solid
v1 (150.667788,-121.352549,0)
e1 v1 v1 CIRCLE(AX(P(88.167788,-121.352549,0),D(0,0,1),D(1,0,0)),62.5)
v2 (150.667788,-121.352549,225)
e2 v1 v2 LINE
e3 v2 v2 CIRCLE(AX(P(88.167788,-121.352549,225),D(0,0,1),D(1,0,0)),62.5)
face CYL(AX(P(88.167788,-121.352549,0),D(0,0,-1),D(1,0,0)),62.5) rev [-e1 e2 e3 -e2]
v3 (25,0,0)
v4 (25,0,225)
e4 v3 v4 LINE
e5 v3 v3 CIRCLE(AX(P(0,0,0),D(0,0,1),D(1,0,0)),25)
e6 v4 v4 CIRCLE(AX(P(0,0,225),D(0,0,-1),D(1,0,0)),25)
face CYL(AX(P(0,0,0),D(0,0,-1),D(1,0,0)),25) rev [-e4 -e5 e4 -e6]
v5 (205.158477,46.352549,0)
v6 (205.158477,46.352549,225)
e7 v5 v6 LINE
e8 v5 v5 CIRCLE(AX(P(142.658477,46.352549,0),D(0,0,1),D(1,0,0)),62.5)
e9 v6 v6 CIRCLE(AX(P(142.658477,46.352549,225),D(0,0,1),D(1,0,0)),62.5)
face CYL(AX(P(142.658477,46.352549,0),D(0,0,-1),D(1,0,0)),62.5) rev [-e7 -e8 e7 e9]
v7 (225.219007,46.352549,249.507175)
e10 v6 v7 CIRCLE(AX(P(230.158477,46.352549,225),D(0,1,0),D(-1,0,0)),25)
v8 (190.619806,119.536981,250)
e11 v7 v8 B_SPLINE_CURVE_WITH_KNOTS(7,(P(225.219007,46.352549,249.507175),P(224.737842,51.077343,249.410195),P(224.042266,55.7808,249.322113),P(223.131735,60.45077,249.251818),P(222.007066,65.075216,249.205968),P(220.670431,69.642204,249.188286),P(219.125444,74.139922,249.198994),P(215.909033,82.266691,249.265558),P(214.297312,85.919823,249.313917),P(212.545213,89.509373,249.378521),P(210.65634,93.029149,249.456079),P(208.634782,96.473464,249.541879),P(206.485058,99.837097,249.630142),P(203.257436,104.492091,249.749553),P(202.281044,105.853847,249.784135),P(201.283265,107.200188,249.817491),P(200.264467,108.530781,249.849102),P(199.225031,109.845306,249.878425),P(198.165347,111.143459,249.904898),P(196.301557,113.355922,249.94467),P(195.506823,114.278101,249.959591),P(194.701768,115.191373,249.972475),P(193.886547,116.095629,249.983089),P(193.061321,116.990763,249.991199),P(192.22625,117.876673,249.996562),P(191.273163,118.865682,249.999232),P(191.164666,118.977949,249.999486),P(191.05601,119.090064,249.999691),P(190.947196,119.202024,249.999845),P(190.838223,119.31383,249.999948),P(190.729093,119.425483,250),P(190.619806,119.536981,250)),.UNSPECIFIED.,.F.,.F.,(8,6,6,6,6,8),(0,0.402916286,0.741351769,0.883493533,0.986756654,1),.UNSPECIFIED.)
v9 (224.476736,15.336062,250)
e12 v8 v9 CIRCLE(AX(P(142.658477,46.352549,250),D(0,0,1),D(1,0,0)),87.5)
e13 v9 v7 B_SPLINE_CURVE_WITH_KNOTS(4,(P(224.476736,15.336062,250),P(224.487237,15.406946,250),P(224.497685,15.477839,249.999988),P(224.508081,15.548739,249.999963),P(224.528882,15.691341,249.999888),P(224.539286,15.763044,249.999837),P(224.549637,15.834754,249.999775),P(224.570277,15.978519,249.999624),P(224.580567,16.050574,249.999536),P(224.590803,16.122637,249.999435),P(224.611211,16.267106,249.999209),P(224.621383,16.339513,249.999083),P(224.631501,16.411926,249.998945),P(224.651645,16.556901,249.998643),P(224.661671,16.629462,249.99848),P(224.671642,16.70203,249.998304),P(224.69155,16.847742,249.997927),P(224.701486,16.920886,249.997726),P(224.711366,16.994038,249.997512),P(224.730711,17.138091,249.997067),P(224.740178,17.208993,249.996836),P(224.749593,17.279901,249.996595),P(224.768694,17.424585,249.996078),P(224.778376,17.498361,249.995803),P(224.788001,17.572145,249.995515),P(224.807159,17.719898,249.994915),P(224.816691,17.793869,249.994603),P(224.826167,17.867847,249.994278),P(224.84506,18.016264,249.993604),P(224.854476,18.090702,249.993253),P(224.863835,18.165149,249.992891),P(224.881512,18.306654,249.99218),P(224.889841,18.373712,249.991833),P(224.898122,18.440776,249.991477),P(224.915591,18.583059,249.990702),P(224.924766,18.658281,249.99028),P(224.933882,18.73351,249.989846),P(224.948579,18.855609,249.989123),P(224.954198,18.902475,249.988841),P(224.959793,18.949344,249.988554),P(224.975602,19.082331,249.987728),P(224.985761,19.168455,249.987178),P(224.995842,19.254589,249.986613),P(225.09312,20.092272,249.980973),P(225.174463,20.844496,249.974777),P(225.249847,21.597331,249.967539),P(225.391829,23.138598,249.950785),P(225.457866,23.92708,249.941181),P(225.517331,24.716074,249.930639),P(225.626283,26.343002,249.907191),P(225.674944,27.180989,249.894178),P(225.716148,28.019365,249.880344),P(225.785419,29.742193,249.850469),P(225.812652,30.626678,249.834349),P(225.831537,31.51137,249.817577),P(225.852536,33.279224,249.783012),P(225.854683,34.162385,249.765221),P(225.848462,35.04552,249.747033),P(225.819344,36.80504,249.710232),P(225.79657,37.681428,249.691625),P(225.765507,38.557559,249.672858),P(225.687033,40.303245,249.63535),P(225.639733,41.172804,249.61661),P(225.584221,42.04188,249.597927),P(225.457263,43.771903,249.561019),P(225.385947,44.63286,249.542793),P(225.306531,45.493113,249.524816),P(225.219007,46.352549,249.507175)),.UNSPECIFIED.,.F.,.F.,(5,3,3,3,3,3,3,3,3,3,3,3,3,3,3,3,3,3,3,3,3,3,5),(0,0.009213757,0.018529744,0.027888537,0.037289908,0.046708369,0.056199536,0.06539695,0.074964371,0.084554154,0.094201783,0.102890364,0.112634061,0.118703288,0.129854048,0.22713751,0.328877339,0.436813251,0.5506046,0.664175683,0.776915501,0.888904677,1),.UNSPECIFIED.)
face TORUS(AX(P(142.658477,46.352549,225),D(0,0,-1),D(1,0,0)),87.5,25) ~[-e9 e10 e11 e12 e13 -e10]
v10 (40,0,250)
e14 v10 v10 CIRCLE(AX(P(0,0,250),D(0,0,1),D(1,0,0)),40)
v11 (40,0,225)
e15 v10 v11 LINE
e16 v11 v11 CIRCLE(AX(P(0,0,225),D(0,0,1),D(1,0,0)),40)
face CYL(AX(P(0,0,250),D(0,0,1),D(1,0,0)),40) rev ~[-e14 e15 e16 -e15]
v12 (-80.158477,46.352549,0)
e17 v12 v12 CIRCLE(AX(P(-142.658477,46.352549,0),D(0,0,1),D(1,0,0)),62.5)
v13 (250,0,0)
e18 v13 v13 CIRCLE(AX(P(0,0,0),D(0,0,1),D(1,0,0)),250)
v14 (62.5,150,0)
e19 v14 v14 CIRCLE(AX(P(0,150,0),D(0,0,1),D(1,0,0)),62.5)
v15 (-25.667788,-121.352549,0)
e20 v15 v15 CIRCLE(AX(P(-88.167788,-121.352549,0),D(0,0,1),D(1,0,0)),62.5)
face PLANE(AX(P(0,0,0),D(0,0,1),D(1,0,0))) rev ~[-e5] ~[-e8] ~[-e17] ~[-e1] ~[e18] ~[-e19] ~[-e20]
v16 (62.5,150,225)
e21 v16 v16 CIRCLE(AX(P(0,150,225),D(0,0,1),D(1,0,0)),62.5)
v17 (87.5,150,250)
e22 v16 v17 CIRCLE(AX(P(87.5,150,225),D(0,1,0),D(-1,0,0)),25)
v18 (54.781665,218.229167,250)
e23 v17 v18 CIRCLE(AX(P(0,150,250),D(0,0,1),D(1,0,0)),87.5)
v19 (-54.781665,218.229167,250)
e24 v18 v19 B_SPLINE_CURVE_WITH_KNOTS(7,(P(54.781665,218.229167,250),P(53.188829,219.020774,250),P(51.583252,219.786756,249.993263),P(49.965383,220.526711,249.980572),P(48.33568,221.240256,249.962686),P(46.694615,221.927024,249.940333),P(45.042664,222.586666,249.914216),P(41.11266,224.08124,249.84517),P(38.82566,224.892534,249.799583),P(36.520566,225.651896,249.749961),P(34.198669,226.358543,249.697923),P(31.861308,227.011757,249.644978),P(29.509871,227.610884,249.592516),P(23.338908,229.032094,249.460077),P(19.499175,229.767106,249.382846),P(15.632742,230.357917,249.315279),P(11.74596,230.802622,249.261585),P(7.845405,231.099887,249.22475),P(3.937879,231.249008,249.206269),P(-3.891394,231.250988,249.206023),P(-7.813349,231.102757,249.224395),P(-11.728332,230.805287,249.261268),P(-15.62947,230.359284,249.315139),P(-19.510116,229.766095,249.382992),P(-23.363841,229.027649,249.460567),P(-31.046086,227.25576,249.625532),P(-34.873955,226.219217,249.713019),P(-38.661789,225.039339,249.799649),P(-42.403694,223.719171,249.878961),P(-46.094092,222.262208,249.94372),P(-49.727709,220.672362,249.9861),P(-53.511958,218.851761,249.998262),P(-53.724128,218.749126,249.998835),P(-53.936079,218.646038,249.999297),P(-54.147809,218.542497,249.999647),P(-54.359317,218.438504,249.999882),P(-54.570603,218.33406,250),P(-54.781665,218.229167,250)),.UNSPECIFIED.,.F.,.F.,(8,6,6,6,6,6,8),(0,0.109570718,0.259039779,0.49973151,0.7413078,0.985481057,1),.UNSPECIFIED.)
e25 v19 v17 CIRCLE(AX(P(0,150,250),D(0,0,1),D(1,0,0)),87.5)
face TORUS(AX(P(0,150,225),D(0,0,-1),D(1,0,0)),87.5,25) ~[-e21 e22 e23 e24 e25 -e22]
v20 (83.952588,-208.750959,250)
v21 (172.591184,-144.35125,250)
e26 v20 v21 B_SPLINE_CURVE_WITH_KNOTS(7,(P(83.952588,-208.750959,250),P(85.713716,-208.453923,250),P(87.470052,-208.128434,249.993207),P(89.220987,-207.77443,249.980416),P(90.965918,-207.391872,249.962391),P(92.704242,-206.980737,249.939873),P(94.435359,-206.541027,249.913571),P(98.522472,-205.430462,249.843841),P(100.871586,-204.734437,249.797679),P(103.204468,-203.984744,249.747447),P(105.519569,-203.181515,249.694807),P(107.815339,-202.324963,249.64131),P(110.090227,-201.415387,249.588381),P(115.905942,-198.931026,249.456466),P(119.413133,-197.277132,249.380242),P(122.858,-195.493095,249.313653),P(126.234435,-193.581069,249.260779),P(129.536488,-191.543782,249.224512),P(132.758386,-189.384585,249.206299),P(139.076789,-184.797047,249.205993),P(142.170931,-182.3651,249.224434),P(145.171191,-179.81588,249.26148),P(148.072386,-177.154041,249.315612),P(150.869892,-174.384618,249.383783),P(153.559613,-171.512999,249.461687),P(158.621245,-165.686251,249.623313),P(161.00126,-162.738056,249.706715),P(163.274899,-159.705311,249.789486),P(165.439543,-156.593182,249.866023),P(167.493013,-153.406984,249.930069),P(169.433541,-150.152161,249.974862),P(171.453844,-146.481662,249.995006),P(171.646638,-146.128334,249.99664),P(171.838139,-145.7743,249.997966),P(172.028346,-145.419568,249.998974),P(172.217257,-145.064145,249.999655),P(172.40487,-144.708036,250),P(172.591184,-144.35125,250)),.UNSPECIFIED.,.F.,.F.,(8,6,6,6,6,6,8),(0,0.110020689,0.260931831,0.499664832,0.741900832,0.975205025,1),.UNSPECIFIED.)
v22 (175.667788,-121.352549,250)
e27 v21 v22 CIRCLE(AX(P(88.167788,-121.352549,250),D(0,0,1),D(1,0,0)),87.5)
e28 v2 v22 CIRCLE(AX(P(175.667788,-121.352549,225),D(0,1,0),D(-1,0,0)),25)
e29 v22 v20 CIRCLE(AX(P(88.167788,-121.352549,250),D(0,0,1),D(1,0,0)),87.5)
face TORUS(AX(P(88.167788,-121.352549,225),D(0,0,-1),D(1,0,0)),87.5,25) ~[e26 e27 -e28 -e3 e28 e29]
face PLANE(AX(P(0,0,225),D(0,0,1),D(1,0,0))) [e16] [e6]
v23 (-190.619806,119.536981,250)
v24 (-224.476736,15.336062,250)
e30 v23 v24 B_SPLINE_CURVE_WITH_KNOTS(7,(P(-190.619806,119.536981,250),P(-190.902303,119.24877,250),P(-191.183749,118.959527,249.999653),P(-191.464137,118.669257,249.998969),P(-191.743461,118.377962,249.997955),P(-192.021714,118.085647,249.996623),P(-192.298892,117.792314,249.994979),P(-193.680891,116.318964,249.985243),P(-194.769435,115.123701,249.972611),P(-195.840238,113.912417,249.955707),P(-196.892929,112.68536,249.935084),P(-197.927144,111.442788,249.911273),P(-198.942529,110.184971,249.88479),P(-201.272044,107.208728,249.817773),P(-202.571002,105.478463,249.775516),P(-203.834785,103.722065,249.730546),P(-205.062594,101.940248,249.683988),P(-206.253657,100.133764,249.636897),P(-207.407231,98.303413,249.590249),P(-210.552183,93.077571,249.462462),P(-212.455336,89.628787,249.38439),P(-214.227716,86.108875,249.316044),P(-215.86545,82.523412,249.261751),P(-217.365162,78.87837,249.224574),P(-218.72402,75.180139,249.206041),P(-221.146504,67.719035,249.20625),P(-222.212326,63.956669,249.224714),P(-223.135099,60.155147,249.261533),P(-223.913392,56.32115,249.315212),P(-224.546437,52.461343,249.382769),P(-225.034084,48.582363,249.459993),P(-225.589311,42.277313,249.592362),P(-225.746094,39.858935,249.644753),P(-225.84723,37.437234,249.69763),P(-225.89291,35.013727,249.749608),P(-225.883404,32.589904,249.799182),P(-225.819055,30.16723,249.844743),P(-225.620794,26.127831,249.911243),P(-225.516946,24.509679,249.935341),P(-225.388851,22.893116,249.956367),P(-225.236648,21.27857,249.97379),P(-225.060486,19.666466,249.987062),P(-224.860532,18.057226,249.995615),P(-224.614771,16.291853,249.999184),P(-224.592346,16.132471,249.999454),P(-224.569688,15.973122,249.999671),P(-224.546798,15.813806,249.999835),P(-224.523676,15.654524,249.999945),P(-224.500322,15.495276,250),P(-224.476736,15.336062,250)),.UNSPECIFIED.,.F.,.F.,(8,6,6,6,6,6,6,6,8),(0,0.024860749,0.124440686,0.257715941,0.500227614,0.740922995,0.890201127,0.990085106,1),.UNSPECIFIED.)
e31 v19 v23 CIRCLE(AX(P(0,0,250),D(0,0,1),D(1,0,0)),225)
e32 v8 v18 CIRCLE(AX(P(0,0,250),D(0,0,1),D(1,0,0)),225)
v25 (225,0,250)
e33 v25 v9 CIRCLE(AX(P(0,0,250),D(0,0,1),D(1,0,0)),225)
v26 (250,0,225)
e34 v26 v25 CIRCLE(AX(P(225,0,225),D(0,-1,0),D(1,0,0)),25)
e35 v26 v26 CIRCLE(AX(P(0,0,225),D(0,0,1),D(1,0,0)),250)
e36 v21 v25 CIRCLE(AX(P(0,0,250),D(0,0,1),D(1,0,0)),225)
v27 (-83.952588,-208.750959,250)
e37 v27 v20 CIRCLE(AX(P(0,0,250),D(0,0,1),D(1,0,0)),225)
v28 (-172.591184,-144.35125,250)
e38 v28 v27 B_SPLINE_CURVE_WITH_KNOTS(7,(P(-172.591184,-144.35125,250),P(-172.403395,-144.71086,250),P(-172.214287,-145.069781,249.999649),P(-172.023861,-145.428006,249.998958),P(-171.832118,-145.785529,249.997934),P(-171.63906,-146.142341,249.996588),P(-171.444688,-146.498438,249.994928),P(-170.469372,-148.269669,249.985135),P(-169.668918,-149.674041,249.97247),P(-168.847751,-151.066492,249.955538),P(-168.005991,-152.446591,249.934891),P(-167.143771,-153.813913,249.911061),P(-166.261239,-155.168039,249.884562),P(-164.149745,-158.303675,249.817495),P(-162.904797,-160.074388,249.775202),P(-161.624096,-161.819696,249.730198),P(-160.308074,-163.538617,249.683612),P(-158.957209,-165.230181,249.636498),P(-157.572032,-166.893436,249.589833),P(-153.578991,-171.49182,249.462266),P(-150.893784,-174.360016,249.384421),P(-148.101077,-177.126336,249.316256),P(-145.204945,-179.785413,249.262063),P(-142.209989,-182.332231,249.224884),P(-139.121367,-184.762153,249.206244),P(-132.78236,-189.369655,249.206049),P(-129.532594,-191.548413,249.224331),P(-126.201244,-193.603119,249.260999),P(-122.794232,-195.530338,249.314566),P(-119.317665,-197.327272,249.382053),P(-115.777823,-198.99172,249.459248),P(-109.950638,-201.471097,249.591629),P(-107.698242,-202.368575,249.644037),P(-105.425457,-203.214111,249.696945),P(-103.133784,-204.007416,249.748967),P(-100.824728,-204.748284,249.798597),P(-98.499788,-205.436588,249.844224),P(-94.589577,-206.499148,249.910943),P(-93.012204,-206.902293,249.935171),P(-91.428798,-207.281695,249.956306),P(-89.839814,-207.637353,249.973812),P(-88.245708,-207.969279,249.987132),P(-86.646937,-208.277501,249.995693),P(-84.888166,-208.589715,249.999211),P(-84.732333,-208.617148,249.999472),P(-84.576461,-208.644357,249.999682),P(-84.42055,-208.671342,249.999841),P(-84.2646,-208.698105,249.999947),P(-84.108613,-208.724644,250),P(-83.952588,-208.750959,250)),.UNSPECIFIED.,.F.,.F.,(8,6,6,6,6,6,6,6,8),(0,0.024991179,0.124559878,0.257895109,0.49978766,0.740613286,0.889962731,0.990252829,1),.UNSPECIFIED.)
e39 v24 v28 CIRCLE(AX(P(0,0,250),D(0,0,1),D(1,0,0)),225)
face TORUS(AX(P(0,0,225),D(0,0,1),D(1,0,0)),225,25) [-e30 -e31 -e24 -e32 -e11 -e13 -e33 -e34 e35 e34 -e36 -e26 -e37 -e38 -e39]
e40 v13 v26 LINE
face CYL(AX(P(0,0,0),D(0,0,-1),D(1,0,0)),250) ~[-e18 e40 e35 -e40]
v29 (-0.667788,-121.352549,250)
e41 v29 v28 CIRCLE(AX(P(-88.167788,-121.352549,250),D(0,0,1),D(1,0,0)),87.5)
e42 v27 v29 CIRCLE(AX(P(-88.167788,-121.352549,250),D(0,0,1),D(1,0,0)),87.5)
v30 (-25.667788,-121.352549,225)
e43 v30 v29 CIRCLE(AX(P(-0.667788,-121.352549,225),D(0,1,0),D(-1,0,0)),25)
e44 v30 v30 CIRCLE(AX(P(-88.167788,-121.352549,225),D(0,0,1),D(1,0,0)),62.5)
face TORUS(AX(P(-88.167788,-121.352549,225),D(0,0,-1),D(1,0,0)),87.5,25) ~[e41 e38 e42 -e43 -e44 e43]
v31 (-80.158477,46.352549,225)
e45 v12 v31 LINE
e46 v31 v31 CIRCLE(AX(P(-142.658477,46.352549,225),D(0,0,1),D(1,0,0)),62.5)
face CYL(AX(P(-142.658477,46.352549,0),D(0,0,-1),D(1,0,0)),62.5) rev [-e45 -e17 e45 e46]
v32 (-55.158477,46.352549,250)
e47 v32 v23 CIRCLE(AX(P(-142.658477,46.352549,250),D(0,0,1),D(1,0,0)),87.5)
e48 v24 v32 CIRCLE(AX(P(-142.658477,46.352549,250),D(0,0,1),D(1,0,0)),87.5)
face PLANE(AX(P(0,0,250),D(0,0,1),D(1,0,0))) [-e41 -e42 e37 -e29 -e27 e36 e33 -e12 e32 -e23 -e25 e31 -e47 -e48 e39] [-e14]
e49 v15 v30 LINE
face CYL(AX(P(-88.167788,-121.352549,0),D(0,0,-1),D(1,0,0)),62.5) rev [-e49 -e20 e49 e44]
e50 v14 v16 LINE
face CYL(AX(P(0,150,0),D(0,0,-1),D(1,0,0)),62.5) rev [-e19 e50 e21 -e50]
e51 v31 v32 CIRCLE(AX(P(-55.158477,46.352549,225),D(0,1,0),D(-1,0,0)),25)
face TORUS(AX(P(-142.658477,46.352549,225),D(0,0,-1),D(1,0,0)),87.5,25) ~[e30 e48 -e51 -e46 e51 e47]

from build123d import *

# Parameters (mm, degrees)
F0_R     = 250
F0_R_2   = 62.5
F0_R_3   = 25
F1_DEPTH = 250
F3_R     = 40
F4_DEPTH = 25


# Not quite as in the source:
# - a fillet or chamfer that OpenCascade refuses, or shapes differently, is made with other operations: its cross-section is extruded or revolved along the edge and cut away or added


with BuildPart() as f1:
    # F0 (on Top) → F1 (new body)
    with BuildSketch(Plane.XY):
        Circle(F0_R)
        with Locations((-88.1677878439, -121.3525491562)):
            Circle(F0_R_2, mode=Mode.SUBTRACT)
        with Locations((88.1677878439, -121.3525491562)):
            Circle(F0_R_2, mode=Mode.SUBTRACT)
        with Locations((-142.6584774443, 46.3525491562)):
            Circle(F0_R_2, mode=Mode.SUBTRACT)
        Circle(F0_R_3, mode=Mode.SUBTRACT)
        with Locations((142.6584774443, 46.3525491562)):
            Circle(F0_R_2, mode=Mode.SUBTRACT)
        with Locations((0, 150)):
            Circle(F0_R_2, mode=Mode.SUBTRACT)
    extrude(amount=F1_DEPTH)

    # F2: fillet of radius 25 on 6 edges, made by hand

    # F2_s1 → F2_t2 (revolve, cut)
    with BuildSketch(Plane.XZ.offset(121.3525491562)):
        with BuildLine():
            ThreePointArc((-25.6677878439, 225), (-18.3454573735, 242.6776695297), (-0.6677878439, 250))
            Line((-0.6677878439, 250), (-25.6677878439, 250))
            Line((-25.6677878439, 250), (-25.6677878439, 225))
        make_face()
    revolve(axis=Axis((-88.1677878439, -121.3525491562, 250), (0, 0, 1)), mode=Mode.SUBTRACT)

    # F2_s3 → F2_t4 (revolve, cut)
    with BuildSketch(Plane.XZ.offset(-46.3525491562)):
        with BuildLine():
            ThreePointArc((-80.1584774443, 225), (-72.8361469739, 242.6776695297), (-55.1584774443, 250))
            Line((-55.1584774443, 250), (-80.1584774443, 250))
            Line((-80.1584774443, 250), (-80.1584774443, 225))
        make_face()
    revolve(axis=Axis((-142.6584774443, 46.3525491562, 250), (0, 0, 1)), mode=Mode.SUBTRACT)

    # F2_s5 → F2_t6 (revolve, cut)
    with BuildSketch(Plane.XZ.offset(-150)):
        with BuildLine():
            ThreePointArc((62.5, 225), (69.8223304703, 242.6776695297), (87.5, 250))
            Line((87.5, 250), (62.5, 250))
            Line((62.5, 250), (62.5, 225))
        make_face()
    revolve(axis=Axis((0, 150, 250), (0, 0, 1)), mode=Mode.SUBTRACT)

    # F2_s7 → F2_t8 (revolve, cut)
    with BuildSketch(Plane.XZ.offset(-46.3525491562)):
        with BuildLine():
            ThreePointArc((205.1584774443, 225), (212.4808079146, 242.6776695297), (230.1584774443, 250))
            Line((230.1584774443, 250), (205.1584774443, 250))
            Line((205.1584774443, 250), (205.1584774443, 225))
        make_face()
    revolve(axis=Axis((142.6584774443, 46.3525491562, 250), (0, 0, 1)), mode=Mode.SUBTRACT)

    # F2_s9 → F2_t10 (revolve, cut)
    with BuildSketch(Plane.XZ.offset(121.3525491562)):
        with BuildLine():
            ThreePointArc((150.6677878439, 225), (157.9901183142, 242.6776695297), (175.6677878439, 250))
            Line((175.6677878439, 250), (150.6677878439, 250))
            Line((150.6677878439, 250), (150.6677878439, 225))
        make_face()
    revolve(axis=Axis((88.1677878439, -121.3525491562, 250), (0, 0, 1)), mode=Mode.SUBTRACT)

    # F2_s11 → F2_t12 (revolve, cut)
    with BuildSketch(Plane.XZ):
        with BuildLine():
            ThreePointArc((250, 225), (242.6776695297, 242.6776695297), (225, 250))
            Line((225, 250), (250, 250))
            Line((250, 250), (250, 225))
        make_face()
    revolve(axis=Axis((0, 0, 250), (0, 0, 1)), mode=Mode.SUBTRACT)

    # F3 (on face) → F4 (cut)
    with BuildSketch(Plane.XY.offset(250)):
        Circle(F3_R)
    extrude(amount=-F4_DEPTH, mode=Mode.SUBTRACT)


solid = f1.part
